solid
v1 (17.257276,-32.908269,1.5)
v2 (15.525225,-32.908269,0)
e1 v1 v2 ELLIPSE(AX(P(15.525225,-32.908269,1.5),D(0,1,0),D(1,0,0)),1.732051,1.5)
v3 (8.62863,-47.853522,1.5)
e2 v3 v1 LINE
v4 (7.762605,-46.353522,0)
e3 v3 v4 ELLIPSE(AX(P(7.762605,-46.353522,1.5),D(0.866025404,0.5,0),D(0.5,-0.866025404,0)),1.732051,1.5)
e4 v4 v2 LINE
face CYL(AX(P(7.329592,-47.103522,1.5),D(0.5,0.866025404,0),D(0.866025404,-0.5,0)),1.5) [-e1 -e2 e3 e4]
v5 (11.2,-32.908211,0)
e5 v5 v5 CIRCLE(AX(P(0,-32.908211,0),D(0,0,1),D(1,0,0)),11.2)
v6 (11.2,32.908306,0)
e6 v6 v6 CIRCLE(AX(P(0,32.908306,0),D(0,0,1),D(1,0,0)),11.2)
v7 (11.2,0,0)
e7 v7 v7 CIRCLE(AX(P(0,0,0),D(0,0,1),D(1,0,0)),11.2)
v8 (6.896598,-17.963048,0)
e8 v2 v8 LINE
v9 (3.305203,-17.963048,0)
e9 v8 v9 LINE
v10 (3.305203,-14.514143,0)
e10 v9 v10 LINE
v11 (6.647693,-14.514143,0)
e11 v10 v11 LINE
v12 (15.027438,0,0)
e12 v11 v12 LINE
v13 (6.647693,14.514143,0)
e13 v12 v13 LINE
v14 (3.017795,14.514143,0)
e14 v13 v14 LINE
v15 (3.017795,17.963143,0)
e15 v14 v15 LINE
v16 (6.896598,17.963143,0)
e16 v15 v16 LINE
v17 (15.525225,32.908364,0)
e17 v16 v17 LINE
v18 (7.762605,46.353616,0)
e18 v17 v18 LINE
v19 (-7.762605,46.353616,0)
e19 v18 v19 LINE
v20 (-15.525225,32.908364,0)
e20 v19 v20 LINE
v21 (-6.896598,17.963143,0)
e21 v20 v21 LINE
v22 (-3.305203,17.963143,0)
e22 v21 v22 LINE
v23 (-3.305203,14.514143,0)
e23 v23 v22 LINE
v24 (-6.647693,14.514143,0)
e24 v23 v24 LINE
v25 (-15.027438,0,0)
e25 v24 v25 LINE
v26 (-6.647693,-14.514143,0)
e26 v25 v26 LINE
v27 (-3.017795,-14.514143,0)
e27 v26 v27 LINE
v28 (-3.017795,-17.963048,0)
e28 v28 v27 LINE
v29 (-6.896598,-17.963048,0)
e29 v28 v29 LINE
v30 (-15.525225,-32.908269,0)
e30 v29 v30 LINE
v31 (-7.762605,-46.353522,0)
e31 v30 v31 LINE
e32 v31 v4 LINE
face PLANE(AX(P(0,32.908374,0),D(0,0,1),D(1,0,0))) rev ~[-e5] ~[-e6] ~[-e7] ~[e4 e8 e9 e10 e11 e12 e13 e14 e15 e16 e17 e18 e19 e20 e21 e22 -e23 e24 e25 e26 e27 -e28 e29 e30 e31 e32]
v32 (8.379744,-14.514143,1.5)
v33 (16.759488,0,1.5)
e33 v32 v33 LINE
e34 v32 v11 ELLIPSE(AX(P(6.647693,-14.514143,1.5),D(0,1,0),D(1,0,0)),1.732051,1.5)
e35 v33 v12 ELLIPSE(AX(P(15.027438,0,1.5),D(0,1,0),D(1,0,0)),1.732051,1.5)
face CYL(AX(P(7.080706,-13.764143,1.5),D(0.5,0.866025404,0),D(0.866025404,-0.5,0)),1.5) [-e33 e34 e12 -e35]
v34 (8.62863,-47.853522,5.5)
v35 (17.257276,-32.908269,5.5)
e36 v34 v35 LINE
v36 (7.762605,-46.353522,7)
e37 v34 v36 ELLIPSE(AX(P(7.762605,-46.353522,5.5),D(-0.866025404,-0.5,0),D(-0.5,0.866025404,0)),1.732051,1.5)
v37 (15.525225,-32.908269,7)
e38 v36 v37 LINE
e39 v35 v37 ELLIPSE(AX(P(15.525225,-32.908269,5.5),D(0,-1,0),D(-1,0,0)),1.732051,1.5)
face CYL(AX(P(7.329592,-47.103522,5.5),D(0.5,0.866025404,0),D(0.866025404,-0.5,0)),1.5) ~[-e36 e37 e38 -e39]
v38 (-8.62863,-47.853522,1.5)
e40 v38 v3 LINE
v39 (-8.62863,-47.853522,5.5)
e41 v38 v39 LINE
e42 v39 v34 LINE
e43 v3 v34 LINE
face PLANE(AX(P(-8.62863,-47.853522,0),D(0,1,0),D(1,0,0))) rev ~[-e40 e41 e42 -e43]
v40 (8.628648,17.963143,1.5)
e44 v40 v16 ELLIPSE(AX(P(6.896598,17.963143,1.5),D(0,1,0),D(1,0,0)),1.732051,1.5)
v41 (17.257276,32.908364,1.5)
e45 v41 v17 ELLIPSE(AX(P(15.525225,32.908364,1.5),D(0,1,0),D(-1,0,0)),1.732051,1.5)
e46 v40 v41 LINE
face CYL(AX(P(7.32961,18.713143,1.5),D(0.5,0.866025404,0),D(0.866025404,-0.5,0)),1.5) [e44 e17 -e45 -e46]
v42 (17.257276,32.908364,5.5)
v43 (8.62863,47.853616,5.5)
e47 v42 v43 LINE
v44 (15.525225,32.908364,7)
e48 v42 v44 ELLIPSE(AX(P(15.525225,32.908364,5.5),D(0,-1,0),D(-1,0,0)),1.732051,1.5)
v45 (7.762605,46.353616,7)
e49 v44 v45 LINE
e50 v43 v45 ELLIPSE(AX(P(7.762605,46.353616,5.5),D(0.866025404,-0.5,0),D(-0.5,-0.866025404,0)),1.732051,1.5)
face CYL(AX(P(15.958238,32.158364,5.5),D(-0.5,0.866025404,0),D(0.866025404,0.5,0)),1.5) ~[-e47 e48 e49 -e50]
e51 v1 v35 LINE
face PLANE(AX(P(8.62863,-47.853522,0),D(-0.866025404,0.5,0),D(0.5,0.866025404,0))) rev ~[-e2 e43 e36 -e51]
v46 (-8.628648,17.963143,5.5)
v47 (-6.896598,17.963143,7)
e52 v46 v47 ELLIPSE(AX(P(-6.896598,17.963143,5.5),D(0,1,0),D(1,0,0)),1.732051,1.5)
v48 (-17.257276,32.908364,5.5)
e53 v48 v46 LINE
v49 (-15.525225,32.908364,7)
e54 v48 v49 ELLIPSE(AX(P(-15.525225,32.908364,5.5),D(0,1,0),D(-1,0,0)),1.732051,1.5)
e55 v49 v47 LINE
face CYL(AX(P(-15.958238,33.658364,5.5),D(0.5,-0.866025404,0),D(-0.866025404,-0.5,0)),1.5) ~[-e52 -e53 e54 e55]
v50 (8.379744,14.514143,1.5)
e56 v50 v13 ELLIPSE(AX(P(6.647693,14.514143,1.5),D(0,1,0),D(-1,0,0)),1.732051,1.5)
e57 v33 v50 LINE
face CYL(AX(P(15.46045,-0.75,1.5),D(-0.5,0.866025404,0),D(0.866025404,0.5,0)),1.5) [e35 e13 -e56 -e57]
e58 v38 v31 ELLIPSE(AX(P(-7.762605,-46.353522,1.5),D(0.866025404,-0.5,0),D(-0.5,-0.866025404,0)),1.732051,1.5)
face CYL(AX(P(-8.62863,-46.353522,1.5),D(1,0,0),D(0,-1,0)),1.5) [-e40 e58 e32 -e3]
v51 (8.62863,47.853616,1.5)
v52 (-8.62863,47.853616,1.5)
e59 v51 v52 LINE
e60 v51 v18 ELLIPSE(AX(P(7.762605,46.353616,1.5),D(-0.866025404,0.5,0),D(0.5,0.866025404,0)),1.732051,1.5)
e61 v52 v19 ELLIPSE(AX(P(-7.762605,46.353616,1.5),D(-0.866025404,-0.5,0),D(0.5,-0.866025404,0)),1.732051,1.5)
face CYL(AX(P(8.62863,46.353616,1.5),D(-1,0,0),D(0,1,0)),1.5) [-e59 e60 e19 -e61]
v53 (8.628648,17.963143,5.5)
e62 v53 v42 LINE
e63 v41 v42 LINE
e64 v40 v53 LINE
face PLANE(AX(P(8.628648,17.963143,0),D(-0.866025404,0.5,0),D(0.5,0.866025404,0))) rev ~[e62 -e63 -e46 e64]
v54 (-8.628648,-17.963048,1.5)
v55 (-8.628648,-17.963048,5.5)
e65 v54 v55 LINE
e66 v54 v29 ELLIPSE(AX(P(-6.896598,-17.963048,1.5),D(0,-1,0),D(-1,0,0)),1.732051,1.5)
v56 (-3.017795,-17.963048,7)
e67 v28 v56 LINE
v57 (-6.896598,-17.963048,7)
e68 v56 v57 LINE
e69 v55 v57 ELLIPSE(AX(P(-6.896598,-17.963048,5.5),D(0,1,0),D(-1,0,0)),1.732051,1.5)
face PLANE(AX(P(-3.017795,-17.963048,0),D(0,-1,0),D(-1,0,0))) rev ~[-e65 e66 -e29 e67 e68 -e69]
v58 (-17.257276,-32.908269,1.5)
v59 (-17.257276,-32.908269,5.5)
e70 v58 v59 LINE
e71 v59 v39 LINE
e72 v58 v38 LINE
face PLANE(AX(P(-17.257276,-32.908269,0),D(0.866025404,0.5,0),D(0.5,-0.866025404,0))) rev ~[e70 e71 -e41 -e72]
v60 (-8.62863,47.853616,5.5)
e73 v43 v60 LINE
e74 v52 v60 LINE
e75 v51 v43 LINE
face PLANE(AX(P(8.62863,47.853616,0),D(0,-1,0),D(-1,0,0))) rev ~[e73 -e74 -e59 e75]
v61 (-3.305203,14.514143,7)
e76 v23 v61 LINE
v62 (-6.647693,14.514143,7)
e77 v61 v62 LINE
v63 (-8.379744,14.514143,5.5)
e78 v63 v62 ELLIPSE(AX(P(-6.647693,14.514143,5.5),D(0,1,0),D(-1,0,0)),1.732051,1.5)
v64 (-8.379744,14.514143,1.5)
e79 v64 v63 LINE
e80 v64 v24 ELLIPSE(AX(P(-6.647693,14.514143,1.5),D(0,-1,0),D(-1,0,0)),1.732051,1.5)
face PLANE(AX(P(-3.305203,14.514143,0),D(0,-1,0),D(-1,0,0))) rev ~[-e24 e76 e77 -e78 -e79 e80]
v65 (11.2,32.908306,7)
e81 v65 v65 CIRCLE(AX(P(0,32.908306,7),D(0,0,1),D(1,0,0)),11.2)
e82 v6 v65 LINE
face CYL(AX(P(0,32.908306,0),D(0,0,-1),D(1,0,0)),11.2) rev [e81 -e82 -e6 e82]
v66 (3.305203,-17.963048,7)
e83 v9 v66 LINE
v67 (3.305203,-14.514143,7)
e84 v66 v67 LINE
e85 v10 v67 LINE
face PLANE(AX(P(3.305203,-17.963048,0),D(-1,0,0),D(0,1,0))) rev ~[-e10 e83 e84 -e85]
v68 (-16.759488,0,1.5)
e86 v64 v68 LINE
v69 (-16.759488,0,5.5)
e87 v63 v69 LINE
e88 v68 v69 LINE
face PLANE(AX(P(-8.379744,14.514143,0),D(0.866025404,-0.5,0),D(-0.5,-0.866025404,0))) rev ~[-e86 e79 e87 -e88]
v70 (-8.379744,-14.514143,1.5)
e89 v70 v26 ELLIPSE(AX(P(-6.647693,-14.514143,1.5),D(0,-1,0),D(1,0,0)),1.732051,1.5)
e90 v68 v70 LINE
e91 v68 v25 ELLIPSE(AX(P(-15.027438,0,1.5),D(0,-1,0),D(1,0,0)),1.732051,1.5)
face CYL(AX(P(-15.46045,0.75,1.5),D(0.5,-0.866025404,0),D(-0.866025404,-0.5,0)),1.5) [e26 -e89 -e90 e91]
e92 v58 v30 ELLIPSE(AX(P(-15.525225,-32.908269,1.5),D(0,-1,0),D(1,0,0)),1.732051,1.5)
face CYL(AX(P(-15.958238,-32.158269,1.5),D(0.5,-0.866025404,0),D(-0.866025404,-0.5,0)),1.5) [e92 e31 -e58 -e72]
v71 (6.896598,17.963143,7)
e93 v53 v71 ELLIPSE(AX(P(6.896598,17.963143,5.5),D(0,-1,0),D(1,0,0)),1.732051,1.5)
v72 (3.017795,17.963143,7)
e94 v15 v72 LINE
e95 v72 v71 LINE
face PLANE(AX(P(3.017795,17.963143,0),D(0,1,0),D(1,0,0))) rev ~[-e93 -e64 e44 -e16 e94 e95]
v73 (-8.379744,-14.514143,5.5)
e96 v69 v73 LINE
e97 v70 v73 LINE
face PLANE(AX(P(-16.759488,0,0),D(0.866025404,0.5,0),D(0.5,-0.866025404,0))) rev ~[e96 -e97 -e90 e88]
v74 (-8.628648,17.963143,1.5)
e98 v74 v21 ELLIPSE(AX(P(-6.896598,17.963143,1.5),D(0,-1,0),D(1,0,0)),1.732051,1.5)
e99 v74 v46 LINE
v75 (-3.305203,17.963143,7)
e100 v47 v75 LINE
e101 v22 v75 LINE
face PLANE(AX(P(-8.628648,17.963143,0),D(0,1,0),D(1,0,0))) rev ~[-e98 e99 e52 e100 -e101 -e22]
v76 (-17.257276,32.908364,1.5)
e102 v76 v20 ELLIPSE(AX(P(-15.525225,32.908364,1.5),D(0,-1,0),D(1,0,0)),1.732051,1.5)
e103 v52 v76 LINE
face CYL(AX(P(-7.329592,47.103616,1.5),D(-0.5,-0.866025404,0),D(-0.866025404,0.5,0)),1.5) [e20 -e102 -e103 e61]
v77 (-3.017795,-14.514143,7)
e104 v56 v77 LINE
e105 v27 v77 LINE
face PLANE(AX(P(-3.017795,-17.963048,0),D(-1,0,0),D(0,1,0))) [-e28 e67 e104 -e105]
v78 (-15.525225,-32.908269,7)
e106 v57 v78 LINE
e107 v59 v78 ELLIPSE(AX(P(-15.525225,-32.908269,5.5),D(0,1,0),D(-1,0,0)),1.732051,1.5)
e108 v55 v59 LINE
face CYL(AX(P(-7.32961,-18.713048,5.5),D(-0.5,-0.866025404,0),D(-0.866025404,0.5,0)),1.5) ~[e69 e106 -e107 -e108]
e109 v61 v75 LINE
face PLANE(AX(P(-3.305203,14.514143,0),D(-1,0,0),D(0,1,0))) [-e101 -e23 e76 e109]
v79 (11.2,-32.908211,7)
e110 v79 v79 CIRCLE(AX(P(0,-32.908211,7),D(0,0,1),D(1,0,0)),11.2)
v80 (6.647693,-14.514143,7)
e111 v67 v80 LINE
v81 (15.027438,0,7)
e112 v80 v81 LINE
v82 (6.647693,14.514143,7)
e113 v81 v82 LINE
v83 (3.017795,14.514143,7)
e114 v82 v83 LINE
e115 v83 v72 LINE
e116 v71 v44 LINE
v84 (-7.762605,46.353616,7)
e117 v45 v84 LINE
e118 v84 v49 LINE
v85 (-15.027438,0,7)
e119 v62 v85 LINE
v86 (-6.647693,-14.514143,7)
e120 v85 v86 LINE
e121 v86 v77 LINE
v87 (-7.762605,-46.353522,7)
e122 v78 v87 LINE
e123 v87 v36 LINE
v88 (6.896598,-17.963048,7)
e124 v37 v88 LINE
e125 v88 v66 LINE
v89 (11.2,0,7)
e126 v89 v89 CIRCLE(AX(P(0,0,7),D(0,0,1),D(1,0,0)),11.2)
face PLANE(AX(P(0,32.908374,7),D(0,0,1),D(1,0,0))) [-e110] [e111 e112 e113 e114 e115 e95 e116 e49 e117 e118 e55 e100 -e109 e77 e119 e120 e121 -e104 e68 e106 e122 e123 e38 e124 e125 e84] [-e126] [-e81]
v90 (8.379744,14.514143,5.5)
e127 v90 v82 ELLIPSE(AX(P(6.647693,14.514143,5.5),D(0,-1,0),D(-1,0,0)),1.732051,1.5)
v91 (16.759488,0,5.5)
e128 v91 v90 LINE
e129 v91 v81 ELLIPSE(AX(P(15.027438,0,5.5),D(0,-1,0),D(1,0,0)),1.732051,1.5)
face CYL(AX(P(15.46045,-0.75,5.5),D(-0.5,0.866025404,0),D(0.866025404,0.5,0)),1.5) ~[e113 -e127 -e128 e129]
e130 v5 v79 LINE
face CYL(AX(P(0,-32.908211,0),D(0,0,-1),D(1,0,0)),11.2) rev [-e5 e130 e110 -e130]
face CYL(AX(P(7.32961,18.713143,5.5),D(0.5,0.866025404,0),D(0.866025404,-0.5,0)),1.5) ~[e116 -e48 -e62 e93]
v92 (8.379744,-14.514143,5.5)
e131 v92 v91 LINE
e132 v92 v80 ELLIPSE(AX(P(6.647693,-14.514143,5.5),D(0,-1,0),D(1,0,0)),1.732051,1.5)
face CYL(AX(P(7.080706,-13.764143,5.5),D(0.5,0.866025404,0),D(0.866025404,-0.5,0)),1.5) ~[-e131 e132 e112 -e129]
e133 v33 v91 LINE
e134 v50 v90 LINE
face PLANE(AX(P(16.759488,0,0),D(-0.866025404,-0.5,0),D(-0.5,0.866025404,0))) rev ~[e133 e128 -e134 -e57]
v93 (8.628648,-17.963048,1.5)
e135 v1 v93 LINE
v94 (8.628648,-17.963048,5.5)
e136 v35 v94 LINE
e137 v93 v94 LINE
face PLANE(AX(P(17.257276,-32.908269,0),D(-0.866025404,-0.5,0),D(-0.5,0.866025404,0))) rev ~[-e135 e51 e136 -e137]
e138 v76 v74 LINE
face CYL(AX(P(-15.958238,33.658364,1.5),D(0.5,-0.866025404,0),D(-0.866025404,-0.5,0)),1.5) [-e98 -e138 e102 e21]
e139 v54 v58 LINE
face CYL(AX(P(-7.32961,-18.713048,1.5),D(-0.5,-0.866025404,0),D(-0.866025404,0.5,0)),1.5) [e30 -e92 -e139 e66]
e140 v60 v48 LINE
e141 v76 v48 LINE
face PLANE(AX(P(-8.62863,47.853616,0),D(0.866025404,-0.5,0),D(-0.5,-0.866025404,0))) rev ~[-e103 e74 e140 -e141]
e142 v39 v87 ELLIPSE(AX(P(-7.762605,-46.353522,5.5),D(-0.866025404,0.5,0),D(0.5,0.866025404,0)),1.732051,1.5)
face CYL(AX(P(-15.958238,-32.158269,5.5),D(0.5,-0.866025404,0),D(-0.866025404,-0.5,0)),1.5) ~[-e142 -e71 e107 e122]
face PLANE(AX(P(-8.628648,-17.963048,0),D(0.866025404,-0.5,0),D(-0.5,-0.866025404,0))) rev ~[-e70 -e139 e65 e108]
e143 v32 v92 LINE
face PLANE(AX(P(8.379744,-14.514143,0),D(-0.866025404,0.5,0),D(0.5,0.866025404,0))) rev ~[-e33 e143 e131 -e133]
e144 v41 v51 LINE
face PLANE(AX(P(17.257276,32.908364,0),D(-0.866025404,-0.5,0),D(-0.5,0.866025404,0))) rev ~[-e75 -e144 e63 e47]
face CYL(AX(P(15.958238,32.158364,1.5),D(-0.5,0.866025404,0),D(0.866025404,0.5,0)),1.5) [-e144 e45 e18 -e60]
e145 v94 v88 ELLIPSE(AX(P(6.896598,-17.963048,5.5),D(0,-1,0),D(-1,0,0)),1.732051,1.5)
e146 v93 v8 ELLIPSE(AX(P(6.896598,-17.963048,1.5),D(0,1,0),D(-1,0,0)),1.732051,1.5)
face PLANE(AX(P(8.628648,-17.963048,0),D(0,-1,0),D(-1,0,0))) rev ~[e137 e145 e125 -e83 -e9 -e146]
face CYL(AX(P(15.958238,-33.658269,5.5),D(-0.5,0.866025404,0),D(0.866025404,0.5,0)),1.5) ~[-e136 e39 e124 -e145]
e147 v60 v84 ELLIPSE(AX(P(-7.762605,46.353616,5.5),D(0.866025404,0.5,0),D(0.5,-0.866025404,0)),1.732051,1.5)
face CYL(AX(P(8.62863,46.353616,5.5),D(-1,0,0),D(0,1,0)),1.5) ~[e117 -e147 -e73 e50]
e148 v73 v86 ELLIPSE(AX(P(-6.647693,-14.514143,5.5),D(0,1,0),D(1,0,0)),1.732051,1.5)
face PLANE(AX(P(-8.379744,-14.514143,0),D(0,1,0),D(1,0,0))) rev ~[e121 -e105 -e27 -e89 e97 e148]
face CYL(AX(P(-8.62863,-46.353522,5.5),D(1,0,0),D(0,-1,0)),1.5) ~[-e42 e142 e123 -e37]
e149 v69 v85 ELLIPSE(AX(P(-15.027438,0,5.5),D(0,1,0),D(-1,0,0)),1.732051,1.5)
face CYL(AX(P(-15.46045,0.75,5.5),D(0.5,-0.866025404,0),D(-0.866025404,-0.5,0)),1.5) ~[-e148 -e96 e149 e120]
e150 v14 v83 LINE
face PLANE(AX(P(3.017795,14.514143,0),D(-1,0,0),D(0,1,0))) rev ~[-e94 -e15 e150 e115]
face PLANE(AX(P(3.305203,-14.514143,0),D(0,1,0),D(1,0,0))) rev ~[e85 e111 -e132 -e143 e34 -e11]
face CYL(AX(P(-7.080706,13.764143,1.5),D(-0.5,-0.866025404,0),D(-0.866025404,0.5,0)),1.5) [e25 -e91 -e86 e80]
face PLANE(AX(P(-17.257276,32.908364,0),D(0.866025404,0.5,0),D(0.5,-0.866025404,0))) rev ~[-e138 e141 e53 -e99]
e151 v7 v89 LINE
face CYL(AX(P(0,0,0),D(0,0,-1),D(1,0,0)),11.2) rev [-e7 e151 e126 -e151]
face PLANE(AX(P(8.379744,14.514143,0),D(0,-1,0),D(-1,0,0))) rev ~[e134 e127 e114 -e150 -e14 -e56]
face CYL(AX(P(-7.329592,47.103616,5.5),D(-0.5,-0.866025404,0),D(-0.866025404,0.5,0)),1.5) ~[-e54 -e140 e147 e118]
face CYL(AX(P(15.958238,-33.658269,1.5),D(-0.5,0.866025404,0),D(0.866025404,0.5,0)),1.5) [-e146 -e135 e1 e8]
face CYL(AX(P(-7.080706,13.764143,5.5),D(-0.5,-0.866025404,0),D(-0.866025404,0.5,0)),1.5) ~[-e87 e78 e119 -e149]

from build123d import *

# Parameters (mm, degrees)
F0_R     = 11.2
F0_W     = 6.3229973894
F0_H     = 3.449
F1_DEPTH = 7
F2_R     = 1.5


# Not quite as in the source:
# - ends of sketch curves that miss each other by under 0.0002 mm in the source are joined


with BuildPart() as f1:
    # F0 (on Top) → F1 (new body)
    with BuildSketch(Plane.XY):
        Polygon((-3.3052028157, 17.9631426474), (3.0177945737, 17.9631426474), (8.6286484148, 17.9631426474), (17.2572757273, 32.9083635521), (8.628630128, 47.8536161306), (-8.628630128, 47.8536161306), (-17.2572757273, 32.9083635521), (-8.6286484148, 17.9631426474), align=None)
        with Locations((0, 32.9083055258)):
            Circle(F0_R, mode=Mode.SUBTRACT)
        Polygon((3.3052028157, -14.5141426474), (8.3797441645, -14.5141426474), (16.759488329, 0), (8.3797441645, 14.5141426474), (3.0177945737, 14.5141426474), (-3.3052028157, 14.5141426474), (-8.3797441645, 14.5141426474), (-16.759488329, 0), (-8.3797441645, -14.5141426474), (-3.0177945737, -14.5141426474), align=None)
        Circle(F0_R, mode=Mode.SUBTRACT)
        with Locations((-0.143704121, 16.2386426474)):
            Rectangle(F0_W, F0_H)
        Polygon((8.6286484148, -17.9630480707), (3.3052028157, -17.9630480707), (-3.0177945737, -17.9630480707), (-8.6286484148, -17.9630480707), (-17.2572757273, -32.9082689754), (-8.628630128, -47.8535215539), (8.628630128, -47.8535215539), (17.2572757273, -32.9082689754), align=None)
        with Locations((0, -32.9082109491)):
            Circle(F0_R, mode=Mode.SUBTRACT)
        with Locations((0.143704121, -16.2386426474)):
            Rectangle(F0_W, F0_H)
    extrude(amount=F1_DEPTH)

    # F2
    f2_edges = [f1.edges().sort_by_distance(p)[0] for p in [
        (-12.942953, 40.38099, 7),
        (0, 47.853616, 7),
        (12.942953, 40.38099, 7),
        (12.942962, 25.435753, 7),
        (-12.942962, 25.435753, 7),
        (-12.569616, 7.257071, 7),
        (12.569616, -7.257071, 7),
        (-12.569616, -7.257071, 7),
        (-12.942962, -25.435659, 7),
        (12.942962, -25.435659, 7),
        (12.942953, -40.380895, 7),
        (0, -47.853522, 7),
        (-12.942953, -40.380895, 7),
        (12.569616, 7.257071, 7),
        (-12.942953, -40.380895, 0),
        (0, -47.853522, 0),
        (12.942953, -40.380895, 0),
        (12.942962, -25.435659, 0),
        (-12.942962, -25.435659, 0),
        (-12.569616, -7.257071, 0),
        (12.569616, -7.257071, 0),
        (12.569616, 7.257071, 0),
        (-12.569616, 7.257071, 0),
        (-12.942962, 25.435753, 0),
        (-12.942953, 40.38099, 0),
        (12.942953, 40.38099, 0),
        (0, 47.853616, 0),
        (12.942962, 25.435753, 0),
    ]]
    fillet(f2_edges, radius=F2_R)


solid = f1.part
